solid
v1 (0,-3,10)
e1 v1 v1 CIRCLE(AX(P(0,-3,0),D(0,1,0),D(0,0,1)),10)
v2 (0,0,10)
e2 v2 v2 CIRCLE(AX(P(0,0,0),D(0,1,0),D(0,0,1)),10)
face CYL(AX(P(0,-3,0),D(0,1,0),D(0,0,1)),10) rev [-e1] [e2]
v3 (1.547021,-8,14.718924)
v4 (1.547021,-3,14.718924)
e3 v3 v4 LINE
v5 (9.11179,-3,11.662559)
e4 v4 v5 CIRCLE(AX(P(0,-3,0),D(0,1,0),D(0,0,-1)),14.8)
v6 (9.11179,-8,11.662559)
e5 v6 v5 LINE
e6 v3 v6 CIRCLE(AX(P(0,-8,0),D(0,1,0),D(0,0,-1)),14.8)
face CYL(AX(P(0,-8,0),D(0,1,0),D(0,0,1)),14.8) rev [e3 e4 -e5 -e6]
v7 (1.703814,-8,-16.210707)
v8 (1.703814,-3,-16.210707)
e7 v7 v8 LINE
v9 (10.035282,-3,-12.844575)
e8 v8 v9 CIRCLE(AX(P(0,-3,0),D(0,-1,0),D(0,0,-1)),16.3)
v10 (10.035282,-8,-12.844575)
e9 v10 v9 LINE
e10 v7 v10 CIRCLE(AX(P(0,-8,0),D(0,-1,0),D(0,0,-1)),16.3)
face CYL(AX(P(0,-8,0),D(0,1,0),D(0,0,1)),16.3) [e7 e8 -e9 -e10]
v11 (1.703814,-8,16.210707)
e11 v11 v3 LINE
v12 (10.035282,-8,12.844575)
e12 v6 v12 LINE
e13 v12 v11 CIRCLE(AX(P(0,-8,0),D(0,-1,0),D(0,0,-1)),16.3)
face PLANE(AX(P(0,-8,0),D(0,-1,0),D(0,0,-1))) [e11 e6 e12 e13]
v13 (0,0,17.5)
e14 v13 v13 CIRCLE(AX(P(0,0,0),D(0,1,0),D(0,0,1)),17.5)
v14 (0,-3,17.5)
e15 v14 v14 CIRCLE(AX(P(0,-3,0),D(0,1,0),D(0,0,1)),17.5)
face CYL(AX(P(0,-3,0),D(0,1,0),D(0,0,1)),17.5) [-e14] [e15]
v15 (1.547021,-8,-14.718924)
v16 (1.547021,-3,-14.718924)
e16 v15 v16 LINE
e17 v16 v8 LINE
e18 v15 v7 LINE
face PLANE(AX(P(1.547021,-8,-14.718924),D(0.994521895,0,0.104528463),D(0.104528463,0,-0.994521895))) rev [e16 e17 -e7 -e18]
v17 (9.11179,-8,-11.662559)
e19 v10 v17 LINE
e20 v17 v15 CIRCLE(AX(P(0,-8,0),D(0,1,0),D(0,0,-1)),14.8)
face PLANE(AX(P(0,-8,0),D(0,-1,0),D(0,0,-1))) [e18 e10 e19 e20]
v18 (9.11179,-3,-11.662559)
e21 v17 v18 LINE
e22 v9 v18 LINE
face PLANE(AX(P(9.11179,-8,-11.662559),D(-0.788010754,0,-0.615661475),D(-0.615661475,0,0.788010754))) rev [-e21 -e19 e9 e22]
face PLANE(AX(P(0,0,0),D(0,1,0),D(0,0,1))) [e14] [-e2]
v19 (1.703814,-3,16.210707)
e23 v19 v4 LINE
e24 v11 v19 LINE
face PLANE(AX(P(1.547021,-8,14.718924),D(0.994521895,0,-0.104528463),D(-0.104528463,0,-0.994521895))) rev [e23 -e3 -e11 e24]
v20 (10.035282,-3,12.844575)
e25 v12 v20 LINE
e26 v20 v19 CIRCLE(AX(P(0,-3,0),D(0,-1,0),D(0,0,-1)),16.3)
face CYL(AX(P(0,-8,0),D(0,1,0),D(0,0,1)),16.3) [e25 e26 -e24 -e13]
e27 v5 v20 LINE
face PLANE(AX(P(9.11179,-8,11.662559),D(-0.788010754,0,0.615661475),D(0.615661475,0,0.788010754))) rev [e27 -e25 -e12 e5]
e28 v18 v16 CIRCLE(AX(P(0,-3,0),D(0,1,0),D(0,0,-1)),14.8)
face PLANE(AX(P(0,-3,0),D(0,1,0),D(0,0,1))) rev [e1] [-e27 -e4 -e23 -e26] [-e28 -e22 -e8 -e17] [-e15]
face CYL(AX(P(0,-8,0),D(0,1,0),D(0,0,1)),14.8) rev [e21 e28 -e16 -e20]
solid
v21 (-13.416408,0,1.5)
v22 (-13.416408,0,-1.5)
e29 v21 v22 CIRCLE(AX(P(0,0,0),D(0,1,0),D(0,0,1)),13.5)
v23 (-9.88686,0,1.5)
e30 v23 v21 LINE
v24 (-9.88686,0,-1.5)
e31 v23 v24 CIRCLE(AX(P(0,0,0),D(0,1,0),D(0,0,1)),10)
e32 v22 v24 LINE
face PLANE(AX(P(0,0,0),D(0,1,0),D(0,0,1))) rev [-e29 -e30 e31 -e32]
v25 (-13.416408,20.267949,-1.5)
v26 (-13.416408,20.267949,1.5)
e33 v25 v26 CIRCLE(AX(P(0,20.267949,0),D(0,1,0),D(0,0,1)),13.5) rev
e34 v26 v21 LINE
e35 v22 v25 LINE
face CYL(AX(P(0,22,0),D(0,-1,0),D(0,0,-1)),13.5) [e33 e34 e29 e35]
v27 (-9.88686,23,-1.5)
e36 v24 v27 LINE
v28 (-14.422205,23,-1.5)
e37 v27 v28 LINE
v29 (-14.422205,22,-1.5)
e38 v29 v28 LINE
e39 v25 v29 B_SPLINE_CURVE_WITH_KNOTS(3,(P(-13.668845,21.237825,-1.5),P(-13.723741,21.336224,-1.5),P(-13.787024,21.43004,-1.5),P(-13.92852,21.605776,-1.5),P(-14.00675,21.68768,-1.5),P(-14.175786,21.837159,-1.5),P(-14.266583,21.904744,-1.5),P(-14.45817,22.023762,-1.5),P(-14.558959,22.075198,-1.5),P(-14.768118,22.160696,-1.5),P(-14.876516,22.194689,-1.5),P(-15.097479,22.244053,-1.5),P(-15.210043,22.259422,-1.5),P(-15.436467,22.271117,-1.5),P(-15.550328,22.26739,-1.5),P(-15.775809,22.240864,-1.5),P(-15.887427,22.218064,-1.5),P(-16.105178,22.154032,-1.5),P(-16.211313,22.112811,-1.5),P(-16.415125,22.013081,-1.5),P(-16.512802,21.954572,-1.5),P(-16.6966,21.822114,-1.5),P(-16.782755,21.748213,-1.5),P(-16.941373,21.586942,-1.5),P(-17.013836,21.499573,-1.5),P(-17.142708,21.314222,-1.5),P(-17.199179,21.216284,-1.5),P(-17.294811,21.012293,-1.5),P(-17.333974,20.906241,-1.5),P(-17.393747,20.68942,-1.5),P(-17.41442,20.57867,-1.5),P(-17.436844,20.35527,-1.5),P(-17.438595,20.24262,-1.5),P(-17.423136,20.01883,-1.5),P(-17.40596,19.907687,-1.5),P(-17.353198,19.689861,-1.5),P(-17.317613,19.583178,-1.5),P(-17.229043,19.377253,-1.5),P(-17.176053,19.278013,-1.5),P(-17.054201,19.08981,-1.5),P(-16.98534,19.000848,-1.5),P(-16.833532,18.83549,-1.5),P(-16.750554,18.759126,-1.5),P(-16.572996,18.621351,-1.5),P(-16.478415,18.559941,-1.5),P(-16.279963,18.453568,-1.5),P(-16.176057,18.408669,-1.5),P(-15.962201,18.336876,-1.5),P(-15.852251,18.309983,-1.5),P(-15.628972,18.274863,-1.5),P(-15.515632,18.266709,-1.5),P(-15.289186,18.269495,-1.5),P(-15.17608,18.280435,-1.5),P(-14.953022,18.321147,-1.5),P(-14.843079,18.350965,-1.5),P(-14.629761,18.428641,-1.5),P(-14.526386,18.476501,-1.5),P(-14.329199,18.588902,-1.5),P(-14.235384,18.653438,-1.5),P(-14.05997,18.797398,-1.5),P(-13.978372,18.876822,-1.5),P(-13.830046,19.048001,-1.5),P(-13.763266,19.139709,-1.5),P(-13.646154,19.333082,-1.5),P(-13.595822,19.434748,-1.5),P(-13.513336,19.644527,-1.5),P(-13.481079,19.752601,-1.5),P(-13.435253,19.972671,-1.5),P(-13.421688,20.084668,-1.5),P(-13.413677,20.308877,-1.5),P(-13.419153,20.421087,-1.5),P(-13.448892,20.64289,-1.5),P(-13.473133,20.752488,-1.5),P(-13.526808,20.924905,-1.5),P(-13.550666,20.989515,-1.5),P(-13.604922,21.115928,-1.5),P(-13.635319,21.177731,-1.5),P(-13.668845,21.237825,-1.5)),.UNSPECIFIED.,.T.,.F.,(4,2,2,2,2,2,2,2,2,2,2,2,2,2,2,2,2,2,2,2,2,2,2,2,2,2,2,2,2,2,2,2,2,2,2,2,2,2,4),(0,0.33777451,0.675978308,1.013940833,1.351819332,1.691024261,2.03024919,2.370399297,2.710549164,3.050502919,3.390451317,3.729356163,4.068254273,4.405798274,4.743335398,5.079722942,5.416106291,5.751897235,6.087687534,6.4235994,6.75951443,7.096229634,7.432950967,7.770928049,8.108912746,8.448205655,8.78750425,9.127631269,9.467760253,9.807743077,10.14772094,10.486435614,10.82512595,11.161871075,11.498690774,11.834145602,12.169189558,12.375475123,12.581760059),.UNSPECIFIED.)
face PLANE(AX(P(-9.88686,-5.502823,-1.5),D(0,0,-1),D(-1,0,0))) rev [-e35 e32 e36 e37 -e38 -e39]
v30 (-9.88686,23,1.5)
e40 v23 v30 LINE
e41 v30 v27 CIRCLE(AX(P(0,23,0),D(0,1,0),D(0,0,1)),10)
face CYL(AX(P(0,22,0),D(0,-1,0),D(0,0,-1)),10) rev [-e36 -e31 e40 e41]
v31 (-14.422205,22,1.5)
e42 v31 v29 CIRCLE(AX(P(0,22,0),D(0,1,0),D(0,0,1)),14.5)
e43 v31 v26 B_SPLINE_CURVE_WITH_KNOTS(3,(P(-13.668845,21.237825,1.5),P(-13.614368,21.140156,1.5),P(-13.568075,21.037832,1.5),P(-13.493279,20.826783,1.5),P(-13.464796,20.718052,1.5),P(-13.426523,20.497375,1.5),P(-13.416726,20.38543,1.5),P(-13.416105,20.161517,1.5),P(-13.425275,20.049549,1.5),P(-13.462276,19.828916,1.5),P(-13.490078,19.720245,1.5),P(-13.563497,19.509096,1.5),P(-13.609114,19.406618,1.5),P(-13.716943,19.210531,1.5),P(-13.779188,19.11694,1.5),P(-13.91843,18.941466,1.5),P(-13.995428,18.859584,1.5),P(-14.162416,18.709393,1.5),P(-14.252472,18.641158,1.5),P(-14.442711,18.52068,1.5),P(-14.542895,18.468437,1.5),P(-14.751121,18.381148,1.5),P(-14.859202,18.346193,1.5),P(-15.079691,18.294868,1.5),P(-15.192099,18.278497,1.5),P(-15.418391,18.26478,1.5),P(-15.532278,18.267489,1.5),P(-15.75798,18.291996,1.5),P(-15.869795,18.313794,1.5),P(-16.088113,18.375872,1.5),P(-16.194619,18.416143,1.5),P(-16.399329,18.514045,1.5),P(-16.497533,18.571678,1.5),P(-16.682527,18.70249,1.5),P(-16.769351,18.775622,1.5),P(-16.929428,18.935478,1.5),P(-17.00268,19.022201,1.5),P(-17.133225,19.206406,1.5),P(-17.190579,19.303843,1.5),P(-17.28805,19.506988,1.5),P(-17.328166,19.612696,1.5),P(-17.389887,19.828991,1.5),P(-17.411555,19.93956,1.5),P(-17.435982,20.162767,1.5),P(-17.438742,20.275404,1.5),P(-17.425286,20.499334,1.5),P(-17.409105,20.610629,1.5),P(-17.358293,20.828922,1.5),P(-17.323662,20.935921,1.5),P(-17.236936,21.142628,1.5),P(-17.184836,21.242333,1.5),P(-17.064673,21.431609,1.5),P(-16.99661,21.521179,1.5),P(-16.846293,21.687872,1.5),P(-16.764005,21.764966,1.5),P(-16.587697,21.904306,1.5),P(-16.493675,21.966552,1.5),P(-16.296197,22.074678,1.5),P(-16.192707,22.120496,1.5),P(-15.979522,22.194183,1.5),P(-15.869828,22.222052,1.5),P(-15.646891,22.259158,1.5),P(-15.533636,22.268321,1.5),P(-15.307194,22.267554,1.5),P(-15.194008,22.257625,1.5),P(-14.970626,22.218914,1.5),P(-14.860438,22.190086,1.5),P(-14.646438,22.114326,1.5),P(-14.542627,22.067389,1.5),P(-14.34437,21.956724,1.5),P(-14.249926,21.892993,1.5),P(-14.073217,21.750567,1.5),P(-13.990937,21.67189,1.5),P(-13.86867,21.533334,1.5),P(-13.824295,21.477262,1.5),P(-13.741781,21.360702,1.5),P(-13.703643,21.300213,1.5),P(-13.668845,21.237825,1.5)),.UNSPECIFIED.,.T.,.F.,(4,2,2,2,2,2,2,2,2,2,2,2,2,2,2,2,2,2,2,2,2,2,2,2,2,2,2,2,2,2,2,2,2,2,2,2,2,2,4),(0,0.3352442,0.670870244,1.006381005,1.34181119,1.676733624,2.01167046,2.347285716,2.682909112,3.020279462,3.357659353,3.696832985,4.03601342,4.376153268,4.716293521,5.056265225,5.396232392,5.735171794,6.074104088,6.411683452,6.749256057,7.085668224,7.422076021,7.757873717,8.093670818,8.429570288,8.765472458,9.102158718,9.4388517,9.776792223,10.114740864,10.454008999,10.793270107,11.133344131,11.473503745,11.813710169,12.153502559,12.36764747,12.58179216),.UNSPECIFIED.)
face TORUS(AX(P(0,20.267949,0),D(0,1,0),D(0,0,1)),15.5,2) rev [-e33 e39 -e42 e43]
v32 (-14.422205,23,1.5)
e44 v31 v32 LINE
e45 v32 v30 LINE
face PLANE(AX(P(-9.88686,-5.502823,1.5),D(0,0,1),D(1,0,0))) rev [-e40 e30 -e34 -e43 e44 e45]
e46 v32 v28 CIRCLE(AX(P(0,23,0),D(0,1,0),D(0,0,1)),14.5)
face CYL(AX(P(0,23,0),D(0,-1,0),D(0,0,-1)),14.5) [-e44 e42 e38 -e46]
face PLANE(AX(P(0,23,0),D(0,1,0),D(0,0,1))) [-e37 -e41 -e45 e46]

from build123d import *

# Parameters (mm, degrees)
SKETCH2_R           = 13.5
SKETCH2_R_2         = 10
BOSS_EXTRUDE1_DEPTH = 22
SKETCH2_4_R         = 17.5
SKETCH2_4_R_2       = 13.5
SKETCH2_4_R_3       = 10
BOSS_EXTRUDE2_DEPTH = 3
BOSS_EXTRUDE3_DEPTH = 5
SKETCH4_R           = 14.5
SKETCH4_R_2         = 10
BOSS_EXTRUDE4_DEPTH = 1
FILLET1_R           = 2
CUT_EXTRUDE1_START  = -31
CUT_EXTRUDE1_DEPTH  = 31


with BuildPart() as part:
    # Sketch2 → Boss-Extrude1 (new body)
    with BuildSketch(Plane(origin=(0, 0, 0), x_dir=(1, 0, 0), z_dir=(0, 1, 0))):
        with Locations(Location((0, 0, 0), (0, 0, 270))):
            Circle(SKETCH2_R)
        with Locations(Location((0, 0, 0), (0, 0, 270))):
            Circle(SKETCH2_R_2, mode=Mode.SUBTRACT)
    extrude(amount=BOSS_EXTRUDE1_DEPTH)

    # Sketch4 → Boss-Extrude4 (add)
    with BuildSketch(Plane(origin=(0, 22, 0), x_dir=(1, 0, 0), z_dir=(0, 1, 0))):
        with Locations(Location((0, 0, 0), (0, 0, 270))):
            Circle(SKETCH4_R)
        with Locations(Location((0, 0, 0), (0, 0, 270))):
            Circle(SKETCH4_R_2, mode=Mode.SUBTRACT)
    extrude(amount=BOSS_EXTRUDE4_DEPTH)

    # Fillet1
    # the kernel refuses this fillet: 2 mm, written as the material it adds along each edge
    with BuildSketch(Plane(origin=(0, 22, 0), x_dir=(0, 0, 1), z_dir=(-1, 0, 0))) as fillet1_piece_1:
        with BuildLine():
            CenterArc((15.5, -1.732050808), FILLET1_R, 120, 60)
            Line((14.5, 0), (14.48, 0.034641016))
            ThreePointArc((14.48, 0.034641016), (14, 0.04), (13.5, 0.04))
            Line((13.5, 0.04), (13.46, 0))
            Line((13.46, 0), (13.46, -1.732050808))
            Line((13.46, -1.732050808), (13.5, -1.732050808))
        make_face()
    revolve(axis=Axis((0, 22, 0), (0, 1, 0)))

    # Sketch5 → Cut-Extrude1 (cut)
    with BuildSketch(Plane(origin=(0, 23, 0), x_dir=(1, 0, 0), z_dir=(0, 1, 0)).offset(CUT_EXTRUDE1_START)):
        with BuildLine():
            Line((-9.886859967, 1.5), (-14.422205102, 1.5))
            ThreePointArc((-14.422205102, 1.5), (-14.5, 0), (-14.422205102, -1.5))
            Line((-14.422205102, -1.5), (-9.886859967, -1.5))
            ThreePointArc((-9.886859967, -1.5), (-10, 0), (-9.886859967, 1.5))
        make_face()
    extrude(amount=CUT_EXTRUDE1_DEPTH, mode=Mode.SUBTRACT)


with BuildPart() as body_2:
    # Sketch2<4> → Boss-Extrude2 (new body)
    # profile 1 of 2: a face of its own
    with BuildSketch(Plane(origin=(0, 0, 0), x_dir=(1, 0, 0), z_dir=(0, 1, 0))):
        with Locations(Location((0, 0, 0), (0, 0, 270))):
            Circle(SKETCH2_4_R)
        with Locations(Location((0, 0, 0), (0, 0, 270))):
            Circle(SKETCH2_4_R_2, mode=Mode.SUBTRACT)
    # profile 2 of 2: a face of its own
    with BuildSketch(Plane(origin=(0, 0, 0), x_dir=(1, 0, 0), z_dir=(0, 1, 0))):
        with Locations(Location((0, 0, 0), (0, 0, 270))):
            Circle(SKETCH2_4_R_2)
        with Locations(Location((0, 0, 0), (0, 0, 270))):
            Circle(SKETCH2_4_R_3, mode=Mode.SUBTRACT)
    extrude(amount=-BOSS_EXTRUDE2_DEPTH)

    # Sketch3 → Boss-Extrude3 (add)
    with BuildSketch(Plane.XZ.offset(3)):
        with BuildLine():
            Line((9.111789835, 11.662559153), (10.035282048, 12.844575284))
            ThreePointArc((10.035282048, 12.844575284), (6.106087473, 15.113096829), (1.703813951, 16.210706895))
            Line((1.703813951, 16.210706895), (1.547021256, 14.718924051))
            ThreePointArc((1.547021256, 14.718924051), (5.544177583, 13.722321048), (9.111789835, 11.662559153))
        make_face()
        with BuildLine():
            Line((1.547021256, -14.718924051), (1.703813951, -16.210706895))
            ThreePointArc((1.703813951, -16.210706895), (6.106087473, -15.113096829), (10.035282048, -12.844575284))
            Line((10.035282048, -12.844575284), (9.111789835, -11.662559153))
            ThreePointArc((9.111789835, -11.662559153), (5.544177583, -13.722321048), (1.547021256, -14.718924051))
        make_face()
    extrude(amount=BOSS_EXTRUDE3_DEPTH)


solid = Compound([part.part, body_2.part])
